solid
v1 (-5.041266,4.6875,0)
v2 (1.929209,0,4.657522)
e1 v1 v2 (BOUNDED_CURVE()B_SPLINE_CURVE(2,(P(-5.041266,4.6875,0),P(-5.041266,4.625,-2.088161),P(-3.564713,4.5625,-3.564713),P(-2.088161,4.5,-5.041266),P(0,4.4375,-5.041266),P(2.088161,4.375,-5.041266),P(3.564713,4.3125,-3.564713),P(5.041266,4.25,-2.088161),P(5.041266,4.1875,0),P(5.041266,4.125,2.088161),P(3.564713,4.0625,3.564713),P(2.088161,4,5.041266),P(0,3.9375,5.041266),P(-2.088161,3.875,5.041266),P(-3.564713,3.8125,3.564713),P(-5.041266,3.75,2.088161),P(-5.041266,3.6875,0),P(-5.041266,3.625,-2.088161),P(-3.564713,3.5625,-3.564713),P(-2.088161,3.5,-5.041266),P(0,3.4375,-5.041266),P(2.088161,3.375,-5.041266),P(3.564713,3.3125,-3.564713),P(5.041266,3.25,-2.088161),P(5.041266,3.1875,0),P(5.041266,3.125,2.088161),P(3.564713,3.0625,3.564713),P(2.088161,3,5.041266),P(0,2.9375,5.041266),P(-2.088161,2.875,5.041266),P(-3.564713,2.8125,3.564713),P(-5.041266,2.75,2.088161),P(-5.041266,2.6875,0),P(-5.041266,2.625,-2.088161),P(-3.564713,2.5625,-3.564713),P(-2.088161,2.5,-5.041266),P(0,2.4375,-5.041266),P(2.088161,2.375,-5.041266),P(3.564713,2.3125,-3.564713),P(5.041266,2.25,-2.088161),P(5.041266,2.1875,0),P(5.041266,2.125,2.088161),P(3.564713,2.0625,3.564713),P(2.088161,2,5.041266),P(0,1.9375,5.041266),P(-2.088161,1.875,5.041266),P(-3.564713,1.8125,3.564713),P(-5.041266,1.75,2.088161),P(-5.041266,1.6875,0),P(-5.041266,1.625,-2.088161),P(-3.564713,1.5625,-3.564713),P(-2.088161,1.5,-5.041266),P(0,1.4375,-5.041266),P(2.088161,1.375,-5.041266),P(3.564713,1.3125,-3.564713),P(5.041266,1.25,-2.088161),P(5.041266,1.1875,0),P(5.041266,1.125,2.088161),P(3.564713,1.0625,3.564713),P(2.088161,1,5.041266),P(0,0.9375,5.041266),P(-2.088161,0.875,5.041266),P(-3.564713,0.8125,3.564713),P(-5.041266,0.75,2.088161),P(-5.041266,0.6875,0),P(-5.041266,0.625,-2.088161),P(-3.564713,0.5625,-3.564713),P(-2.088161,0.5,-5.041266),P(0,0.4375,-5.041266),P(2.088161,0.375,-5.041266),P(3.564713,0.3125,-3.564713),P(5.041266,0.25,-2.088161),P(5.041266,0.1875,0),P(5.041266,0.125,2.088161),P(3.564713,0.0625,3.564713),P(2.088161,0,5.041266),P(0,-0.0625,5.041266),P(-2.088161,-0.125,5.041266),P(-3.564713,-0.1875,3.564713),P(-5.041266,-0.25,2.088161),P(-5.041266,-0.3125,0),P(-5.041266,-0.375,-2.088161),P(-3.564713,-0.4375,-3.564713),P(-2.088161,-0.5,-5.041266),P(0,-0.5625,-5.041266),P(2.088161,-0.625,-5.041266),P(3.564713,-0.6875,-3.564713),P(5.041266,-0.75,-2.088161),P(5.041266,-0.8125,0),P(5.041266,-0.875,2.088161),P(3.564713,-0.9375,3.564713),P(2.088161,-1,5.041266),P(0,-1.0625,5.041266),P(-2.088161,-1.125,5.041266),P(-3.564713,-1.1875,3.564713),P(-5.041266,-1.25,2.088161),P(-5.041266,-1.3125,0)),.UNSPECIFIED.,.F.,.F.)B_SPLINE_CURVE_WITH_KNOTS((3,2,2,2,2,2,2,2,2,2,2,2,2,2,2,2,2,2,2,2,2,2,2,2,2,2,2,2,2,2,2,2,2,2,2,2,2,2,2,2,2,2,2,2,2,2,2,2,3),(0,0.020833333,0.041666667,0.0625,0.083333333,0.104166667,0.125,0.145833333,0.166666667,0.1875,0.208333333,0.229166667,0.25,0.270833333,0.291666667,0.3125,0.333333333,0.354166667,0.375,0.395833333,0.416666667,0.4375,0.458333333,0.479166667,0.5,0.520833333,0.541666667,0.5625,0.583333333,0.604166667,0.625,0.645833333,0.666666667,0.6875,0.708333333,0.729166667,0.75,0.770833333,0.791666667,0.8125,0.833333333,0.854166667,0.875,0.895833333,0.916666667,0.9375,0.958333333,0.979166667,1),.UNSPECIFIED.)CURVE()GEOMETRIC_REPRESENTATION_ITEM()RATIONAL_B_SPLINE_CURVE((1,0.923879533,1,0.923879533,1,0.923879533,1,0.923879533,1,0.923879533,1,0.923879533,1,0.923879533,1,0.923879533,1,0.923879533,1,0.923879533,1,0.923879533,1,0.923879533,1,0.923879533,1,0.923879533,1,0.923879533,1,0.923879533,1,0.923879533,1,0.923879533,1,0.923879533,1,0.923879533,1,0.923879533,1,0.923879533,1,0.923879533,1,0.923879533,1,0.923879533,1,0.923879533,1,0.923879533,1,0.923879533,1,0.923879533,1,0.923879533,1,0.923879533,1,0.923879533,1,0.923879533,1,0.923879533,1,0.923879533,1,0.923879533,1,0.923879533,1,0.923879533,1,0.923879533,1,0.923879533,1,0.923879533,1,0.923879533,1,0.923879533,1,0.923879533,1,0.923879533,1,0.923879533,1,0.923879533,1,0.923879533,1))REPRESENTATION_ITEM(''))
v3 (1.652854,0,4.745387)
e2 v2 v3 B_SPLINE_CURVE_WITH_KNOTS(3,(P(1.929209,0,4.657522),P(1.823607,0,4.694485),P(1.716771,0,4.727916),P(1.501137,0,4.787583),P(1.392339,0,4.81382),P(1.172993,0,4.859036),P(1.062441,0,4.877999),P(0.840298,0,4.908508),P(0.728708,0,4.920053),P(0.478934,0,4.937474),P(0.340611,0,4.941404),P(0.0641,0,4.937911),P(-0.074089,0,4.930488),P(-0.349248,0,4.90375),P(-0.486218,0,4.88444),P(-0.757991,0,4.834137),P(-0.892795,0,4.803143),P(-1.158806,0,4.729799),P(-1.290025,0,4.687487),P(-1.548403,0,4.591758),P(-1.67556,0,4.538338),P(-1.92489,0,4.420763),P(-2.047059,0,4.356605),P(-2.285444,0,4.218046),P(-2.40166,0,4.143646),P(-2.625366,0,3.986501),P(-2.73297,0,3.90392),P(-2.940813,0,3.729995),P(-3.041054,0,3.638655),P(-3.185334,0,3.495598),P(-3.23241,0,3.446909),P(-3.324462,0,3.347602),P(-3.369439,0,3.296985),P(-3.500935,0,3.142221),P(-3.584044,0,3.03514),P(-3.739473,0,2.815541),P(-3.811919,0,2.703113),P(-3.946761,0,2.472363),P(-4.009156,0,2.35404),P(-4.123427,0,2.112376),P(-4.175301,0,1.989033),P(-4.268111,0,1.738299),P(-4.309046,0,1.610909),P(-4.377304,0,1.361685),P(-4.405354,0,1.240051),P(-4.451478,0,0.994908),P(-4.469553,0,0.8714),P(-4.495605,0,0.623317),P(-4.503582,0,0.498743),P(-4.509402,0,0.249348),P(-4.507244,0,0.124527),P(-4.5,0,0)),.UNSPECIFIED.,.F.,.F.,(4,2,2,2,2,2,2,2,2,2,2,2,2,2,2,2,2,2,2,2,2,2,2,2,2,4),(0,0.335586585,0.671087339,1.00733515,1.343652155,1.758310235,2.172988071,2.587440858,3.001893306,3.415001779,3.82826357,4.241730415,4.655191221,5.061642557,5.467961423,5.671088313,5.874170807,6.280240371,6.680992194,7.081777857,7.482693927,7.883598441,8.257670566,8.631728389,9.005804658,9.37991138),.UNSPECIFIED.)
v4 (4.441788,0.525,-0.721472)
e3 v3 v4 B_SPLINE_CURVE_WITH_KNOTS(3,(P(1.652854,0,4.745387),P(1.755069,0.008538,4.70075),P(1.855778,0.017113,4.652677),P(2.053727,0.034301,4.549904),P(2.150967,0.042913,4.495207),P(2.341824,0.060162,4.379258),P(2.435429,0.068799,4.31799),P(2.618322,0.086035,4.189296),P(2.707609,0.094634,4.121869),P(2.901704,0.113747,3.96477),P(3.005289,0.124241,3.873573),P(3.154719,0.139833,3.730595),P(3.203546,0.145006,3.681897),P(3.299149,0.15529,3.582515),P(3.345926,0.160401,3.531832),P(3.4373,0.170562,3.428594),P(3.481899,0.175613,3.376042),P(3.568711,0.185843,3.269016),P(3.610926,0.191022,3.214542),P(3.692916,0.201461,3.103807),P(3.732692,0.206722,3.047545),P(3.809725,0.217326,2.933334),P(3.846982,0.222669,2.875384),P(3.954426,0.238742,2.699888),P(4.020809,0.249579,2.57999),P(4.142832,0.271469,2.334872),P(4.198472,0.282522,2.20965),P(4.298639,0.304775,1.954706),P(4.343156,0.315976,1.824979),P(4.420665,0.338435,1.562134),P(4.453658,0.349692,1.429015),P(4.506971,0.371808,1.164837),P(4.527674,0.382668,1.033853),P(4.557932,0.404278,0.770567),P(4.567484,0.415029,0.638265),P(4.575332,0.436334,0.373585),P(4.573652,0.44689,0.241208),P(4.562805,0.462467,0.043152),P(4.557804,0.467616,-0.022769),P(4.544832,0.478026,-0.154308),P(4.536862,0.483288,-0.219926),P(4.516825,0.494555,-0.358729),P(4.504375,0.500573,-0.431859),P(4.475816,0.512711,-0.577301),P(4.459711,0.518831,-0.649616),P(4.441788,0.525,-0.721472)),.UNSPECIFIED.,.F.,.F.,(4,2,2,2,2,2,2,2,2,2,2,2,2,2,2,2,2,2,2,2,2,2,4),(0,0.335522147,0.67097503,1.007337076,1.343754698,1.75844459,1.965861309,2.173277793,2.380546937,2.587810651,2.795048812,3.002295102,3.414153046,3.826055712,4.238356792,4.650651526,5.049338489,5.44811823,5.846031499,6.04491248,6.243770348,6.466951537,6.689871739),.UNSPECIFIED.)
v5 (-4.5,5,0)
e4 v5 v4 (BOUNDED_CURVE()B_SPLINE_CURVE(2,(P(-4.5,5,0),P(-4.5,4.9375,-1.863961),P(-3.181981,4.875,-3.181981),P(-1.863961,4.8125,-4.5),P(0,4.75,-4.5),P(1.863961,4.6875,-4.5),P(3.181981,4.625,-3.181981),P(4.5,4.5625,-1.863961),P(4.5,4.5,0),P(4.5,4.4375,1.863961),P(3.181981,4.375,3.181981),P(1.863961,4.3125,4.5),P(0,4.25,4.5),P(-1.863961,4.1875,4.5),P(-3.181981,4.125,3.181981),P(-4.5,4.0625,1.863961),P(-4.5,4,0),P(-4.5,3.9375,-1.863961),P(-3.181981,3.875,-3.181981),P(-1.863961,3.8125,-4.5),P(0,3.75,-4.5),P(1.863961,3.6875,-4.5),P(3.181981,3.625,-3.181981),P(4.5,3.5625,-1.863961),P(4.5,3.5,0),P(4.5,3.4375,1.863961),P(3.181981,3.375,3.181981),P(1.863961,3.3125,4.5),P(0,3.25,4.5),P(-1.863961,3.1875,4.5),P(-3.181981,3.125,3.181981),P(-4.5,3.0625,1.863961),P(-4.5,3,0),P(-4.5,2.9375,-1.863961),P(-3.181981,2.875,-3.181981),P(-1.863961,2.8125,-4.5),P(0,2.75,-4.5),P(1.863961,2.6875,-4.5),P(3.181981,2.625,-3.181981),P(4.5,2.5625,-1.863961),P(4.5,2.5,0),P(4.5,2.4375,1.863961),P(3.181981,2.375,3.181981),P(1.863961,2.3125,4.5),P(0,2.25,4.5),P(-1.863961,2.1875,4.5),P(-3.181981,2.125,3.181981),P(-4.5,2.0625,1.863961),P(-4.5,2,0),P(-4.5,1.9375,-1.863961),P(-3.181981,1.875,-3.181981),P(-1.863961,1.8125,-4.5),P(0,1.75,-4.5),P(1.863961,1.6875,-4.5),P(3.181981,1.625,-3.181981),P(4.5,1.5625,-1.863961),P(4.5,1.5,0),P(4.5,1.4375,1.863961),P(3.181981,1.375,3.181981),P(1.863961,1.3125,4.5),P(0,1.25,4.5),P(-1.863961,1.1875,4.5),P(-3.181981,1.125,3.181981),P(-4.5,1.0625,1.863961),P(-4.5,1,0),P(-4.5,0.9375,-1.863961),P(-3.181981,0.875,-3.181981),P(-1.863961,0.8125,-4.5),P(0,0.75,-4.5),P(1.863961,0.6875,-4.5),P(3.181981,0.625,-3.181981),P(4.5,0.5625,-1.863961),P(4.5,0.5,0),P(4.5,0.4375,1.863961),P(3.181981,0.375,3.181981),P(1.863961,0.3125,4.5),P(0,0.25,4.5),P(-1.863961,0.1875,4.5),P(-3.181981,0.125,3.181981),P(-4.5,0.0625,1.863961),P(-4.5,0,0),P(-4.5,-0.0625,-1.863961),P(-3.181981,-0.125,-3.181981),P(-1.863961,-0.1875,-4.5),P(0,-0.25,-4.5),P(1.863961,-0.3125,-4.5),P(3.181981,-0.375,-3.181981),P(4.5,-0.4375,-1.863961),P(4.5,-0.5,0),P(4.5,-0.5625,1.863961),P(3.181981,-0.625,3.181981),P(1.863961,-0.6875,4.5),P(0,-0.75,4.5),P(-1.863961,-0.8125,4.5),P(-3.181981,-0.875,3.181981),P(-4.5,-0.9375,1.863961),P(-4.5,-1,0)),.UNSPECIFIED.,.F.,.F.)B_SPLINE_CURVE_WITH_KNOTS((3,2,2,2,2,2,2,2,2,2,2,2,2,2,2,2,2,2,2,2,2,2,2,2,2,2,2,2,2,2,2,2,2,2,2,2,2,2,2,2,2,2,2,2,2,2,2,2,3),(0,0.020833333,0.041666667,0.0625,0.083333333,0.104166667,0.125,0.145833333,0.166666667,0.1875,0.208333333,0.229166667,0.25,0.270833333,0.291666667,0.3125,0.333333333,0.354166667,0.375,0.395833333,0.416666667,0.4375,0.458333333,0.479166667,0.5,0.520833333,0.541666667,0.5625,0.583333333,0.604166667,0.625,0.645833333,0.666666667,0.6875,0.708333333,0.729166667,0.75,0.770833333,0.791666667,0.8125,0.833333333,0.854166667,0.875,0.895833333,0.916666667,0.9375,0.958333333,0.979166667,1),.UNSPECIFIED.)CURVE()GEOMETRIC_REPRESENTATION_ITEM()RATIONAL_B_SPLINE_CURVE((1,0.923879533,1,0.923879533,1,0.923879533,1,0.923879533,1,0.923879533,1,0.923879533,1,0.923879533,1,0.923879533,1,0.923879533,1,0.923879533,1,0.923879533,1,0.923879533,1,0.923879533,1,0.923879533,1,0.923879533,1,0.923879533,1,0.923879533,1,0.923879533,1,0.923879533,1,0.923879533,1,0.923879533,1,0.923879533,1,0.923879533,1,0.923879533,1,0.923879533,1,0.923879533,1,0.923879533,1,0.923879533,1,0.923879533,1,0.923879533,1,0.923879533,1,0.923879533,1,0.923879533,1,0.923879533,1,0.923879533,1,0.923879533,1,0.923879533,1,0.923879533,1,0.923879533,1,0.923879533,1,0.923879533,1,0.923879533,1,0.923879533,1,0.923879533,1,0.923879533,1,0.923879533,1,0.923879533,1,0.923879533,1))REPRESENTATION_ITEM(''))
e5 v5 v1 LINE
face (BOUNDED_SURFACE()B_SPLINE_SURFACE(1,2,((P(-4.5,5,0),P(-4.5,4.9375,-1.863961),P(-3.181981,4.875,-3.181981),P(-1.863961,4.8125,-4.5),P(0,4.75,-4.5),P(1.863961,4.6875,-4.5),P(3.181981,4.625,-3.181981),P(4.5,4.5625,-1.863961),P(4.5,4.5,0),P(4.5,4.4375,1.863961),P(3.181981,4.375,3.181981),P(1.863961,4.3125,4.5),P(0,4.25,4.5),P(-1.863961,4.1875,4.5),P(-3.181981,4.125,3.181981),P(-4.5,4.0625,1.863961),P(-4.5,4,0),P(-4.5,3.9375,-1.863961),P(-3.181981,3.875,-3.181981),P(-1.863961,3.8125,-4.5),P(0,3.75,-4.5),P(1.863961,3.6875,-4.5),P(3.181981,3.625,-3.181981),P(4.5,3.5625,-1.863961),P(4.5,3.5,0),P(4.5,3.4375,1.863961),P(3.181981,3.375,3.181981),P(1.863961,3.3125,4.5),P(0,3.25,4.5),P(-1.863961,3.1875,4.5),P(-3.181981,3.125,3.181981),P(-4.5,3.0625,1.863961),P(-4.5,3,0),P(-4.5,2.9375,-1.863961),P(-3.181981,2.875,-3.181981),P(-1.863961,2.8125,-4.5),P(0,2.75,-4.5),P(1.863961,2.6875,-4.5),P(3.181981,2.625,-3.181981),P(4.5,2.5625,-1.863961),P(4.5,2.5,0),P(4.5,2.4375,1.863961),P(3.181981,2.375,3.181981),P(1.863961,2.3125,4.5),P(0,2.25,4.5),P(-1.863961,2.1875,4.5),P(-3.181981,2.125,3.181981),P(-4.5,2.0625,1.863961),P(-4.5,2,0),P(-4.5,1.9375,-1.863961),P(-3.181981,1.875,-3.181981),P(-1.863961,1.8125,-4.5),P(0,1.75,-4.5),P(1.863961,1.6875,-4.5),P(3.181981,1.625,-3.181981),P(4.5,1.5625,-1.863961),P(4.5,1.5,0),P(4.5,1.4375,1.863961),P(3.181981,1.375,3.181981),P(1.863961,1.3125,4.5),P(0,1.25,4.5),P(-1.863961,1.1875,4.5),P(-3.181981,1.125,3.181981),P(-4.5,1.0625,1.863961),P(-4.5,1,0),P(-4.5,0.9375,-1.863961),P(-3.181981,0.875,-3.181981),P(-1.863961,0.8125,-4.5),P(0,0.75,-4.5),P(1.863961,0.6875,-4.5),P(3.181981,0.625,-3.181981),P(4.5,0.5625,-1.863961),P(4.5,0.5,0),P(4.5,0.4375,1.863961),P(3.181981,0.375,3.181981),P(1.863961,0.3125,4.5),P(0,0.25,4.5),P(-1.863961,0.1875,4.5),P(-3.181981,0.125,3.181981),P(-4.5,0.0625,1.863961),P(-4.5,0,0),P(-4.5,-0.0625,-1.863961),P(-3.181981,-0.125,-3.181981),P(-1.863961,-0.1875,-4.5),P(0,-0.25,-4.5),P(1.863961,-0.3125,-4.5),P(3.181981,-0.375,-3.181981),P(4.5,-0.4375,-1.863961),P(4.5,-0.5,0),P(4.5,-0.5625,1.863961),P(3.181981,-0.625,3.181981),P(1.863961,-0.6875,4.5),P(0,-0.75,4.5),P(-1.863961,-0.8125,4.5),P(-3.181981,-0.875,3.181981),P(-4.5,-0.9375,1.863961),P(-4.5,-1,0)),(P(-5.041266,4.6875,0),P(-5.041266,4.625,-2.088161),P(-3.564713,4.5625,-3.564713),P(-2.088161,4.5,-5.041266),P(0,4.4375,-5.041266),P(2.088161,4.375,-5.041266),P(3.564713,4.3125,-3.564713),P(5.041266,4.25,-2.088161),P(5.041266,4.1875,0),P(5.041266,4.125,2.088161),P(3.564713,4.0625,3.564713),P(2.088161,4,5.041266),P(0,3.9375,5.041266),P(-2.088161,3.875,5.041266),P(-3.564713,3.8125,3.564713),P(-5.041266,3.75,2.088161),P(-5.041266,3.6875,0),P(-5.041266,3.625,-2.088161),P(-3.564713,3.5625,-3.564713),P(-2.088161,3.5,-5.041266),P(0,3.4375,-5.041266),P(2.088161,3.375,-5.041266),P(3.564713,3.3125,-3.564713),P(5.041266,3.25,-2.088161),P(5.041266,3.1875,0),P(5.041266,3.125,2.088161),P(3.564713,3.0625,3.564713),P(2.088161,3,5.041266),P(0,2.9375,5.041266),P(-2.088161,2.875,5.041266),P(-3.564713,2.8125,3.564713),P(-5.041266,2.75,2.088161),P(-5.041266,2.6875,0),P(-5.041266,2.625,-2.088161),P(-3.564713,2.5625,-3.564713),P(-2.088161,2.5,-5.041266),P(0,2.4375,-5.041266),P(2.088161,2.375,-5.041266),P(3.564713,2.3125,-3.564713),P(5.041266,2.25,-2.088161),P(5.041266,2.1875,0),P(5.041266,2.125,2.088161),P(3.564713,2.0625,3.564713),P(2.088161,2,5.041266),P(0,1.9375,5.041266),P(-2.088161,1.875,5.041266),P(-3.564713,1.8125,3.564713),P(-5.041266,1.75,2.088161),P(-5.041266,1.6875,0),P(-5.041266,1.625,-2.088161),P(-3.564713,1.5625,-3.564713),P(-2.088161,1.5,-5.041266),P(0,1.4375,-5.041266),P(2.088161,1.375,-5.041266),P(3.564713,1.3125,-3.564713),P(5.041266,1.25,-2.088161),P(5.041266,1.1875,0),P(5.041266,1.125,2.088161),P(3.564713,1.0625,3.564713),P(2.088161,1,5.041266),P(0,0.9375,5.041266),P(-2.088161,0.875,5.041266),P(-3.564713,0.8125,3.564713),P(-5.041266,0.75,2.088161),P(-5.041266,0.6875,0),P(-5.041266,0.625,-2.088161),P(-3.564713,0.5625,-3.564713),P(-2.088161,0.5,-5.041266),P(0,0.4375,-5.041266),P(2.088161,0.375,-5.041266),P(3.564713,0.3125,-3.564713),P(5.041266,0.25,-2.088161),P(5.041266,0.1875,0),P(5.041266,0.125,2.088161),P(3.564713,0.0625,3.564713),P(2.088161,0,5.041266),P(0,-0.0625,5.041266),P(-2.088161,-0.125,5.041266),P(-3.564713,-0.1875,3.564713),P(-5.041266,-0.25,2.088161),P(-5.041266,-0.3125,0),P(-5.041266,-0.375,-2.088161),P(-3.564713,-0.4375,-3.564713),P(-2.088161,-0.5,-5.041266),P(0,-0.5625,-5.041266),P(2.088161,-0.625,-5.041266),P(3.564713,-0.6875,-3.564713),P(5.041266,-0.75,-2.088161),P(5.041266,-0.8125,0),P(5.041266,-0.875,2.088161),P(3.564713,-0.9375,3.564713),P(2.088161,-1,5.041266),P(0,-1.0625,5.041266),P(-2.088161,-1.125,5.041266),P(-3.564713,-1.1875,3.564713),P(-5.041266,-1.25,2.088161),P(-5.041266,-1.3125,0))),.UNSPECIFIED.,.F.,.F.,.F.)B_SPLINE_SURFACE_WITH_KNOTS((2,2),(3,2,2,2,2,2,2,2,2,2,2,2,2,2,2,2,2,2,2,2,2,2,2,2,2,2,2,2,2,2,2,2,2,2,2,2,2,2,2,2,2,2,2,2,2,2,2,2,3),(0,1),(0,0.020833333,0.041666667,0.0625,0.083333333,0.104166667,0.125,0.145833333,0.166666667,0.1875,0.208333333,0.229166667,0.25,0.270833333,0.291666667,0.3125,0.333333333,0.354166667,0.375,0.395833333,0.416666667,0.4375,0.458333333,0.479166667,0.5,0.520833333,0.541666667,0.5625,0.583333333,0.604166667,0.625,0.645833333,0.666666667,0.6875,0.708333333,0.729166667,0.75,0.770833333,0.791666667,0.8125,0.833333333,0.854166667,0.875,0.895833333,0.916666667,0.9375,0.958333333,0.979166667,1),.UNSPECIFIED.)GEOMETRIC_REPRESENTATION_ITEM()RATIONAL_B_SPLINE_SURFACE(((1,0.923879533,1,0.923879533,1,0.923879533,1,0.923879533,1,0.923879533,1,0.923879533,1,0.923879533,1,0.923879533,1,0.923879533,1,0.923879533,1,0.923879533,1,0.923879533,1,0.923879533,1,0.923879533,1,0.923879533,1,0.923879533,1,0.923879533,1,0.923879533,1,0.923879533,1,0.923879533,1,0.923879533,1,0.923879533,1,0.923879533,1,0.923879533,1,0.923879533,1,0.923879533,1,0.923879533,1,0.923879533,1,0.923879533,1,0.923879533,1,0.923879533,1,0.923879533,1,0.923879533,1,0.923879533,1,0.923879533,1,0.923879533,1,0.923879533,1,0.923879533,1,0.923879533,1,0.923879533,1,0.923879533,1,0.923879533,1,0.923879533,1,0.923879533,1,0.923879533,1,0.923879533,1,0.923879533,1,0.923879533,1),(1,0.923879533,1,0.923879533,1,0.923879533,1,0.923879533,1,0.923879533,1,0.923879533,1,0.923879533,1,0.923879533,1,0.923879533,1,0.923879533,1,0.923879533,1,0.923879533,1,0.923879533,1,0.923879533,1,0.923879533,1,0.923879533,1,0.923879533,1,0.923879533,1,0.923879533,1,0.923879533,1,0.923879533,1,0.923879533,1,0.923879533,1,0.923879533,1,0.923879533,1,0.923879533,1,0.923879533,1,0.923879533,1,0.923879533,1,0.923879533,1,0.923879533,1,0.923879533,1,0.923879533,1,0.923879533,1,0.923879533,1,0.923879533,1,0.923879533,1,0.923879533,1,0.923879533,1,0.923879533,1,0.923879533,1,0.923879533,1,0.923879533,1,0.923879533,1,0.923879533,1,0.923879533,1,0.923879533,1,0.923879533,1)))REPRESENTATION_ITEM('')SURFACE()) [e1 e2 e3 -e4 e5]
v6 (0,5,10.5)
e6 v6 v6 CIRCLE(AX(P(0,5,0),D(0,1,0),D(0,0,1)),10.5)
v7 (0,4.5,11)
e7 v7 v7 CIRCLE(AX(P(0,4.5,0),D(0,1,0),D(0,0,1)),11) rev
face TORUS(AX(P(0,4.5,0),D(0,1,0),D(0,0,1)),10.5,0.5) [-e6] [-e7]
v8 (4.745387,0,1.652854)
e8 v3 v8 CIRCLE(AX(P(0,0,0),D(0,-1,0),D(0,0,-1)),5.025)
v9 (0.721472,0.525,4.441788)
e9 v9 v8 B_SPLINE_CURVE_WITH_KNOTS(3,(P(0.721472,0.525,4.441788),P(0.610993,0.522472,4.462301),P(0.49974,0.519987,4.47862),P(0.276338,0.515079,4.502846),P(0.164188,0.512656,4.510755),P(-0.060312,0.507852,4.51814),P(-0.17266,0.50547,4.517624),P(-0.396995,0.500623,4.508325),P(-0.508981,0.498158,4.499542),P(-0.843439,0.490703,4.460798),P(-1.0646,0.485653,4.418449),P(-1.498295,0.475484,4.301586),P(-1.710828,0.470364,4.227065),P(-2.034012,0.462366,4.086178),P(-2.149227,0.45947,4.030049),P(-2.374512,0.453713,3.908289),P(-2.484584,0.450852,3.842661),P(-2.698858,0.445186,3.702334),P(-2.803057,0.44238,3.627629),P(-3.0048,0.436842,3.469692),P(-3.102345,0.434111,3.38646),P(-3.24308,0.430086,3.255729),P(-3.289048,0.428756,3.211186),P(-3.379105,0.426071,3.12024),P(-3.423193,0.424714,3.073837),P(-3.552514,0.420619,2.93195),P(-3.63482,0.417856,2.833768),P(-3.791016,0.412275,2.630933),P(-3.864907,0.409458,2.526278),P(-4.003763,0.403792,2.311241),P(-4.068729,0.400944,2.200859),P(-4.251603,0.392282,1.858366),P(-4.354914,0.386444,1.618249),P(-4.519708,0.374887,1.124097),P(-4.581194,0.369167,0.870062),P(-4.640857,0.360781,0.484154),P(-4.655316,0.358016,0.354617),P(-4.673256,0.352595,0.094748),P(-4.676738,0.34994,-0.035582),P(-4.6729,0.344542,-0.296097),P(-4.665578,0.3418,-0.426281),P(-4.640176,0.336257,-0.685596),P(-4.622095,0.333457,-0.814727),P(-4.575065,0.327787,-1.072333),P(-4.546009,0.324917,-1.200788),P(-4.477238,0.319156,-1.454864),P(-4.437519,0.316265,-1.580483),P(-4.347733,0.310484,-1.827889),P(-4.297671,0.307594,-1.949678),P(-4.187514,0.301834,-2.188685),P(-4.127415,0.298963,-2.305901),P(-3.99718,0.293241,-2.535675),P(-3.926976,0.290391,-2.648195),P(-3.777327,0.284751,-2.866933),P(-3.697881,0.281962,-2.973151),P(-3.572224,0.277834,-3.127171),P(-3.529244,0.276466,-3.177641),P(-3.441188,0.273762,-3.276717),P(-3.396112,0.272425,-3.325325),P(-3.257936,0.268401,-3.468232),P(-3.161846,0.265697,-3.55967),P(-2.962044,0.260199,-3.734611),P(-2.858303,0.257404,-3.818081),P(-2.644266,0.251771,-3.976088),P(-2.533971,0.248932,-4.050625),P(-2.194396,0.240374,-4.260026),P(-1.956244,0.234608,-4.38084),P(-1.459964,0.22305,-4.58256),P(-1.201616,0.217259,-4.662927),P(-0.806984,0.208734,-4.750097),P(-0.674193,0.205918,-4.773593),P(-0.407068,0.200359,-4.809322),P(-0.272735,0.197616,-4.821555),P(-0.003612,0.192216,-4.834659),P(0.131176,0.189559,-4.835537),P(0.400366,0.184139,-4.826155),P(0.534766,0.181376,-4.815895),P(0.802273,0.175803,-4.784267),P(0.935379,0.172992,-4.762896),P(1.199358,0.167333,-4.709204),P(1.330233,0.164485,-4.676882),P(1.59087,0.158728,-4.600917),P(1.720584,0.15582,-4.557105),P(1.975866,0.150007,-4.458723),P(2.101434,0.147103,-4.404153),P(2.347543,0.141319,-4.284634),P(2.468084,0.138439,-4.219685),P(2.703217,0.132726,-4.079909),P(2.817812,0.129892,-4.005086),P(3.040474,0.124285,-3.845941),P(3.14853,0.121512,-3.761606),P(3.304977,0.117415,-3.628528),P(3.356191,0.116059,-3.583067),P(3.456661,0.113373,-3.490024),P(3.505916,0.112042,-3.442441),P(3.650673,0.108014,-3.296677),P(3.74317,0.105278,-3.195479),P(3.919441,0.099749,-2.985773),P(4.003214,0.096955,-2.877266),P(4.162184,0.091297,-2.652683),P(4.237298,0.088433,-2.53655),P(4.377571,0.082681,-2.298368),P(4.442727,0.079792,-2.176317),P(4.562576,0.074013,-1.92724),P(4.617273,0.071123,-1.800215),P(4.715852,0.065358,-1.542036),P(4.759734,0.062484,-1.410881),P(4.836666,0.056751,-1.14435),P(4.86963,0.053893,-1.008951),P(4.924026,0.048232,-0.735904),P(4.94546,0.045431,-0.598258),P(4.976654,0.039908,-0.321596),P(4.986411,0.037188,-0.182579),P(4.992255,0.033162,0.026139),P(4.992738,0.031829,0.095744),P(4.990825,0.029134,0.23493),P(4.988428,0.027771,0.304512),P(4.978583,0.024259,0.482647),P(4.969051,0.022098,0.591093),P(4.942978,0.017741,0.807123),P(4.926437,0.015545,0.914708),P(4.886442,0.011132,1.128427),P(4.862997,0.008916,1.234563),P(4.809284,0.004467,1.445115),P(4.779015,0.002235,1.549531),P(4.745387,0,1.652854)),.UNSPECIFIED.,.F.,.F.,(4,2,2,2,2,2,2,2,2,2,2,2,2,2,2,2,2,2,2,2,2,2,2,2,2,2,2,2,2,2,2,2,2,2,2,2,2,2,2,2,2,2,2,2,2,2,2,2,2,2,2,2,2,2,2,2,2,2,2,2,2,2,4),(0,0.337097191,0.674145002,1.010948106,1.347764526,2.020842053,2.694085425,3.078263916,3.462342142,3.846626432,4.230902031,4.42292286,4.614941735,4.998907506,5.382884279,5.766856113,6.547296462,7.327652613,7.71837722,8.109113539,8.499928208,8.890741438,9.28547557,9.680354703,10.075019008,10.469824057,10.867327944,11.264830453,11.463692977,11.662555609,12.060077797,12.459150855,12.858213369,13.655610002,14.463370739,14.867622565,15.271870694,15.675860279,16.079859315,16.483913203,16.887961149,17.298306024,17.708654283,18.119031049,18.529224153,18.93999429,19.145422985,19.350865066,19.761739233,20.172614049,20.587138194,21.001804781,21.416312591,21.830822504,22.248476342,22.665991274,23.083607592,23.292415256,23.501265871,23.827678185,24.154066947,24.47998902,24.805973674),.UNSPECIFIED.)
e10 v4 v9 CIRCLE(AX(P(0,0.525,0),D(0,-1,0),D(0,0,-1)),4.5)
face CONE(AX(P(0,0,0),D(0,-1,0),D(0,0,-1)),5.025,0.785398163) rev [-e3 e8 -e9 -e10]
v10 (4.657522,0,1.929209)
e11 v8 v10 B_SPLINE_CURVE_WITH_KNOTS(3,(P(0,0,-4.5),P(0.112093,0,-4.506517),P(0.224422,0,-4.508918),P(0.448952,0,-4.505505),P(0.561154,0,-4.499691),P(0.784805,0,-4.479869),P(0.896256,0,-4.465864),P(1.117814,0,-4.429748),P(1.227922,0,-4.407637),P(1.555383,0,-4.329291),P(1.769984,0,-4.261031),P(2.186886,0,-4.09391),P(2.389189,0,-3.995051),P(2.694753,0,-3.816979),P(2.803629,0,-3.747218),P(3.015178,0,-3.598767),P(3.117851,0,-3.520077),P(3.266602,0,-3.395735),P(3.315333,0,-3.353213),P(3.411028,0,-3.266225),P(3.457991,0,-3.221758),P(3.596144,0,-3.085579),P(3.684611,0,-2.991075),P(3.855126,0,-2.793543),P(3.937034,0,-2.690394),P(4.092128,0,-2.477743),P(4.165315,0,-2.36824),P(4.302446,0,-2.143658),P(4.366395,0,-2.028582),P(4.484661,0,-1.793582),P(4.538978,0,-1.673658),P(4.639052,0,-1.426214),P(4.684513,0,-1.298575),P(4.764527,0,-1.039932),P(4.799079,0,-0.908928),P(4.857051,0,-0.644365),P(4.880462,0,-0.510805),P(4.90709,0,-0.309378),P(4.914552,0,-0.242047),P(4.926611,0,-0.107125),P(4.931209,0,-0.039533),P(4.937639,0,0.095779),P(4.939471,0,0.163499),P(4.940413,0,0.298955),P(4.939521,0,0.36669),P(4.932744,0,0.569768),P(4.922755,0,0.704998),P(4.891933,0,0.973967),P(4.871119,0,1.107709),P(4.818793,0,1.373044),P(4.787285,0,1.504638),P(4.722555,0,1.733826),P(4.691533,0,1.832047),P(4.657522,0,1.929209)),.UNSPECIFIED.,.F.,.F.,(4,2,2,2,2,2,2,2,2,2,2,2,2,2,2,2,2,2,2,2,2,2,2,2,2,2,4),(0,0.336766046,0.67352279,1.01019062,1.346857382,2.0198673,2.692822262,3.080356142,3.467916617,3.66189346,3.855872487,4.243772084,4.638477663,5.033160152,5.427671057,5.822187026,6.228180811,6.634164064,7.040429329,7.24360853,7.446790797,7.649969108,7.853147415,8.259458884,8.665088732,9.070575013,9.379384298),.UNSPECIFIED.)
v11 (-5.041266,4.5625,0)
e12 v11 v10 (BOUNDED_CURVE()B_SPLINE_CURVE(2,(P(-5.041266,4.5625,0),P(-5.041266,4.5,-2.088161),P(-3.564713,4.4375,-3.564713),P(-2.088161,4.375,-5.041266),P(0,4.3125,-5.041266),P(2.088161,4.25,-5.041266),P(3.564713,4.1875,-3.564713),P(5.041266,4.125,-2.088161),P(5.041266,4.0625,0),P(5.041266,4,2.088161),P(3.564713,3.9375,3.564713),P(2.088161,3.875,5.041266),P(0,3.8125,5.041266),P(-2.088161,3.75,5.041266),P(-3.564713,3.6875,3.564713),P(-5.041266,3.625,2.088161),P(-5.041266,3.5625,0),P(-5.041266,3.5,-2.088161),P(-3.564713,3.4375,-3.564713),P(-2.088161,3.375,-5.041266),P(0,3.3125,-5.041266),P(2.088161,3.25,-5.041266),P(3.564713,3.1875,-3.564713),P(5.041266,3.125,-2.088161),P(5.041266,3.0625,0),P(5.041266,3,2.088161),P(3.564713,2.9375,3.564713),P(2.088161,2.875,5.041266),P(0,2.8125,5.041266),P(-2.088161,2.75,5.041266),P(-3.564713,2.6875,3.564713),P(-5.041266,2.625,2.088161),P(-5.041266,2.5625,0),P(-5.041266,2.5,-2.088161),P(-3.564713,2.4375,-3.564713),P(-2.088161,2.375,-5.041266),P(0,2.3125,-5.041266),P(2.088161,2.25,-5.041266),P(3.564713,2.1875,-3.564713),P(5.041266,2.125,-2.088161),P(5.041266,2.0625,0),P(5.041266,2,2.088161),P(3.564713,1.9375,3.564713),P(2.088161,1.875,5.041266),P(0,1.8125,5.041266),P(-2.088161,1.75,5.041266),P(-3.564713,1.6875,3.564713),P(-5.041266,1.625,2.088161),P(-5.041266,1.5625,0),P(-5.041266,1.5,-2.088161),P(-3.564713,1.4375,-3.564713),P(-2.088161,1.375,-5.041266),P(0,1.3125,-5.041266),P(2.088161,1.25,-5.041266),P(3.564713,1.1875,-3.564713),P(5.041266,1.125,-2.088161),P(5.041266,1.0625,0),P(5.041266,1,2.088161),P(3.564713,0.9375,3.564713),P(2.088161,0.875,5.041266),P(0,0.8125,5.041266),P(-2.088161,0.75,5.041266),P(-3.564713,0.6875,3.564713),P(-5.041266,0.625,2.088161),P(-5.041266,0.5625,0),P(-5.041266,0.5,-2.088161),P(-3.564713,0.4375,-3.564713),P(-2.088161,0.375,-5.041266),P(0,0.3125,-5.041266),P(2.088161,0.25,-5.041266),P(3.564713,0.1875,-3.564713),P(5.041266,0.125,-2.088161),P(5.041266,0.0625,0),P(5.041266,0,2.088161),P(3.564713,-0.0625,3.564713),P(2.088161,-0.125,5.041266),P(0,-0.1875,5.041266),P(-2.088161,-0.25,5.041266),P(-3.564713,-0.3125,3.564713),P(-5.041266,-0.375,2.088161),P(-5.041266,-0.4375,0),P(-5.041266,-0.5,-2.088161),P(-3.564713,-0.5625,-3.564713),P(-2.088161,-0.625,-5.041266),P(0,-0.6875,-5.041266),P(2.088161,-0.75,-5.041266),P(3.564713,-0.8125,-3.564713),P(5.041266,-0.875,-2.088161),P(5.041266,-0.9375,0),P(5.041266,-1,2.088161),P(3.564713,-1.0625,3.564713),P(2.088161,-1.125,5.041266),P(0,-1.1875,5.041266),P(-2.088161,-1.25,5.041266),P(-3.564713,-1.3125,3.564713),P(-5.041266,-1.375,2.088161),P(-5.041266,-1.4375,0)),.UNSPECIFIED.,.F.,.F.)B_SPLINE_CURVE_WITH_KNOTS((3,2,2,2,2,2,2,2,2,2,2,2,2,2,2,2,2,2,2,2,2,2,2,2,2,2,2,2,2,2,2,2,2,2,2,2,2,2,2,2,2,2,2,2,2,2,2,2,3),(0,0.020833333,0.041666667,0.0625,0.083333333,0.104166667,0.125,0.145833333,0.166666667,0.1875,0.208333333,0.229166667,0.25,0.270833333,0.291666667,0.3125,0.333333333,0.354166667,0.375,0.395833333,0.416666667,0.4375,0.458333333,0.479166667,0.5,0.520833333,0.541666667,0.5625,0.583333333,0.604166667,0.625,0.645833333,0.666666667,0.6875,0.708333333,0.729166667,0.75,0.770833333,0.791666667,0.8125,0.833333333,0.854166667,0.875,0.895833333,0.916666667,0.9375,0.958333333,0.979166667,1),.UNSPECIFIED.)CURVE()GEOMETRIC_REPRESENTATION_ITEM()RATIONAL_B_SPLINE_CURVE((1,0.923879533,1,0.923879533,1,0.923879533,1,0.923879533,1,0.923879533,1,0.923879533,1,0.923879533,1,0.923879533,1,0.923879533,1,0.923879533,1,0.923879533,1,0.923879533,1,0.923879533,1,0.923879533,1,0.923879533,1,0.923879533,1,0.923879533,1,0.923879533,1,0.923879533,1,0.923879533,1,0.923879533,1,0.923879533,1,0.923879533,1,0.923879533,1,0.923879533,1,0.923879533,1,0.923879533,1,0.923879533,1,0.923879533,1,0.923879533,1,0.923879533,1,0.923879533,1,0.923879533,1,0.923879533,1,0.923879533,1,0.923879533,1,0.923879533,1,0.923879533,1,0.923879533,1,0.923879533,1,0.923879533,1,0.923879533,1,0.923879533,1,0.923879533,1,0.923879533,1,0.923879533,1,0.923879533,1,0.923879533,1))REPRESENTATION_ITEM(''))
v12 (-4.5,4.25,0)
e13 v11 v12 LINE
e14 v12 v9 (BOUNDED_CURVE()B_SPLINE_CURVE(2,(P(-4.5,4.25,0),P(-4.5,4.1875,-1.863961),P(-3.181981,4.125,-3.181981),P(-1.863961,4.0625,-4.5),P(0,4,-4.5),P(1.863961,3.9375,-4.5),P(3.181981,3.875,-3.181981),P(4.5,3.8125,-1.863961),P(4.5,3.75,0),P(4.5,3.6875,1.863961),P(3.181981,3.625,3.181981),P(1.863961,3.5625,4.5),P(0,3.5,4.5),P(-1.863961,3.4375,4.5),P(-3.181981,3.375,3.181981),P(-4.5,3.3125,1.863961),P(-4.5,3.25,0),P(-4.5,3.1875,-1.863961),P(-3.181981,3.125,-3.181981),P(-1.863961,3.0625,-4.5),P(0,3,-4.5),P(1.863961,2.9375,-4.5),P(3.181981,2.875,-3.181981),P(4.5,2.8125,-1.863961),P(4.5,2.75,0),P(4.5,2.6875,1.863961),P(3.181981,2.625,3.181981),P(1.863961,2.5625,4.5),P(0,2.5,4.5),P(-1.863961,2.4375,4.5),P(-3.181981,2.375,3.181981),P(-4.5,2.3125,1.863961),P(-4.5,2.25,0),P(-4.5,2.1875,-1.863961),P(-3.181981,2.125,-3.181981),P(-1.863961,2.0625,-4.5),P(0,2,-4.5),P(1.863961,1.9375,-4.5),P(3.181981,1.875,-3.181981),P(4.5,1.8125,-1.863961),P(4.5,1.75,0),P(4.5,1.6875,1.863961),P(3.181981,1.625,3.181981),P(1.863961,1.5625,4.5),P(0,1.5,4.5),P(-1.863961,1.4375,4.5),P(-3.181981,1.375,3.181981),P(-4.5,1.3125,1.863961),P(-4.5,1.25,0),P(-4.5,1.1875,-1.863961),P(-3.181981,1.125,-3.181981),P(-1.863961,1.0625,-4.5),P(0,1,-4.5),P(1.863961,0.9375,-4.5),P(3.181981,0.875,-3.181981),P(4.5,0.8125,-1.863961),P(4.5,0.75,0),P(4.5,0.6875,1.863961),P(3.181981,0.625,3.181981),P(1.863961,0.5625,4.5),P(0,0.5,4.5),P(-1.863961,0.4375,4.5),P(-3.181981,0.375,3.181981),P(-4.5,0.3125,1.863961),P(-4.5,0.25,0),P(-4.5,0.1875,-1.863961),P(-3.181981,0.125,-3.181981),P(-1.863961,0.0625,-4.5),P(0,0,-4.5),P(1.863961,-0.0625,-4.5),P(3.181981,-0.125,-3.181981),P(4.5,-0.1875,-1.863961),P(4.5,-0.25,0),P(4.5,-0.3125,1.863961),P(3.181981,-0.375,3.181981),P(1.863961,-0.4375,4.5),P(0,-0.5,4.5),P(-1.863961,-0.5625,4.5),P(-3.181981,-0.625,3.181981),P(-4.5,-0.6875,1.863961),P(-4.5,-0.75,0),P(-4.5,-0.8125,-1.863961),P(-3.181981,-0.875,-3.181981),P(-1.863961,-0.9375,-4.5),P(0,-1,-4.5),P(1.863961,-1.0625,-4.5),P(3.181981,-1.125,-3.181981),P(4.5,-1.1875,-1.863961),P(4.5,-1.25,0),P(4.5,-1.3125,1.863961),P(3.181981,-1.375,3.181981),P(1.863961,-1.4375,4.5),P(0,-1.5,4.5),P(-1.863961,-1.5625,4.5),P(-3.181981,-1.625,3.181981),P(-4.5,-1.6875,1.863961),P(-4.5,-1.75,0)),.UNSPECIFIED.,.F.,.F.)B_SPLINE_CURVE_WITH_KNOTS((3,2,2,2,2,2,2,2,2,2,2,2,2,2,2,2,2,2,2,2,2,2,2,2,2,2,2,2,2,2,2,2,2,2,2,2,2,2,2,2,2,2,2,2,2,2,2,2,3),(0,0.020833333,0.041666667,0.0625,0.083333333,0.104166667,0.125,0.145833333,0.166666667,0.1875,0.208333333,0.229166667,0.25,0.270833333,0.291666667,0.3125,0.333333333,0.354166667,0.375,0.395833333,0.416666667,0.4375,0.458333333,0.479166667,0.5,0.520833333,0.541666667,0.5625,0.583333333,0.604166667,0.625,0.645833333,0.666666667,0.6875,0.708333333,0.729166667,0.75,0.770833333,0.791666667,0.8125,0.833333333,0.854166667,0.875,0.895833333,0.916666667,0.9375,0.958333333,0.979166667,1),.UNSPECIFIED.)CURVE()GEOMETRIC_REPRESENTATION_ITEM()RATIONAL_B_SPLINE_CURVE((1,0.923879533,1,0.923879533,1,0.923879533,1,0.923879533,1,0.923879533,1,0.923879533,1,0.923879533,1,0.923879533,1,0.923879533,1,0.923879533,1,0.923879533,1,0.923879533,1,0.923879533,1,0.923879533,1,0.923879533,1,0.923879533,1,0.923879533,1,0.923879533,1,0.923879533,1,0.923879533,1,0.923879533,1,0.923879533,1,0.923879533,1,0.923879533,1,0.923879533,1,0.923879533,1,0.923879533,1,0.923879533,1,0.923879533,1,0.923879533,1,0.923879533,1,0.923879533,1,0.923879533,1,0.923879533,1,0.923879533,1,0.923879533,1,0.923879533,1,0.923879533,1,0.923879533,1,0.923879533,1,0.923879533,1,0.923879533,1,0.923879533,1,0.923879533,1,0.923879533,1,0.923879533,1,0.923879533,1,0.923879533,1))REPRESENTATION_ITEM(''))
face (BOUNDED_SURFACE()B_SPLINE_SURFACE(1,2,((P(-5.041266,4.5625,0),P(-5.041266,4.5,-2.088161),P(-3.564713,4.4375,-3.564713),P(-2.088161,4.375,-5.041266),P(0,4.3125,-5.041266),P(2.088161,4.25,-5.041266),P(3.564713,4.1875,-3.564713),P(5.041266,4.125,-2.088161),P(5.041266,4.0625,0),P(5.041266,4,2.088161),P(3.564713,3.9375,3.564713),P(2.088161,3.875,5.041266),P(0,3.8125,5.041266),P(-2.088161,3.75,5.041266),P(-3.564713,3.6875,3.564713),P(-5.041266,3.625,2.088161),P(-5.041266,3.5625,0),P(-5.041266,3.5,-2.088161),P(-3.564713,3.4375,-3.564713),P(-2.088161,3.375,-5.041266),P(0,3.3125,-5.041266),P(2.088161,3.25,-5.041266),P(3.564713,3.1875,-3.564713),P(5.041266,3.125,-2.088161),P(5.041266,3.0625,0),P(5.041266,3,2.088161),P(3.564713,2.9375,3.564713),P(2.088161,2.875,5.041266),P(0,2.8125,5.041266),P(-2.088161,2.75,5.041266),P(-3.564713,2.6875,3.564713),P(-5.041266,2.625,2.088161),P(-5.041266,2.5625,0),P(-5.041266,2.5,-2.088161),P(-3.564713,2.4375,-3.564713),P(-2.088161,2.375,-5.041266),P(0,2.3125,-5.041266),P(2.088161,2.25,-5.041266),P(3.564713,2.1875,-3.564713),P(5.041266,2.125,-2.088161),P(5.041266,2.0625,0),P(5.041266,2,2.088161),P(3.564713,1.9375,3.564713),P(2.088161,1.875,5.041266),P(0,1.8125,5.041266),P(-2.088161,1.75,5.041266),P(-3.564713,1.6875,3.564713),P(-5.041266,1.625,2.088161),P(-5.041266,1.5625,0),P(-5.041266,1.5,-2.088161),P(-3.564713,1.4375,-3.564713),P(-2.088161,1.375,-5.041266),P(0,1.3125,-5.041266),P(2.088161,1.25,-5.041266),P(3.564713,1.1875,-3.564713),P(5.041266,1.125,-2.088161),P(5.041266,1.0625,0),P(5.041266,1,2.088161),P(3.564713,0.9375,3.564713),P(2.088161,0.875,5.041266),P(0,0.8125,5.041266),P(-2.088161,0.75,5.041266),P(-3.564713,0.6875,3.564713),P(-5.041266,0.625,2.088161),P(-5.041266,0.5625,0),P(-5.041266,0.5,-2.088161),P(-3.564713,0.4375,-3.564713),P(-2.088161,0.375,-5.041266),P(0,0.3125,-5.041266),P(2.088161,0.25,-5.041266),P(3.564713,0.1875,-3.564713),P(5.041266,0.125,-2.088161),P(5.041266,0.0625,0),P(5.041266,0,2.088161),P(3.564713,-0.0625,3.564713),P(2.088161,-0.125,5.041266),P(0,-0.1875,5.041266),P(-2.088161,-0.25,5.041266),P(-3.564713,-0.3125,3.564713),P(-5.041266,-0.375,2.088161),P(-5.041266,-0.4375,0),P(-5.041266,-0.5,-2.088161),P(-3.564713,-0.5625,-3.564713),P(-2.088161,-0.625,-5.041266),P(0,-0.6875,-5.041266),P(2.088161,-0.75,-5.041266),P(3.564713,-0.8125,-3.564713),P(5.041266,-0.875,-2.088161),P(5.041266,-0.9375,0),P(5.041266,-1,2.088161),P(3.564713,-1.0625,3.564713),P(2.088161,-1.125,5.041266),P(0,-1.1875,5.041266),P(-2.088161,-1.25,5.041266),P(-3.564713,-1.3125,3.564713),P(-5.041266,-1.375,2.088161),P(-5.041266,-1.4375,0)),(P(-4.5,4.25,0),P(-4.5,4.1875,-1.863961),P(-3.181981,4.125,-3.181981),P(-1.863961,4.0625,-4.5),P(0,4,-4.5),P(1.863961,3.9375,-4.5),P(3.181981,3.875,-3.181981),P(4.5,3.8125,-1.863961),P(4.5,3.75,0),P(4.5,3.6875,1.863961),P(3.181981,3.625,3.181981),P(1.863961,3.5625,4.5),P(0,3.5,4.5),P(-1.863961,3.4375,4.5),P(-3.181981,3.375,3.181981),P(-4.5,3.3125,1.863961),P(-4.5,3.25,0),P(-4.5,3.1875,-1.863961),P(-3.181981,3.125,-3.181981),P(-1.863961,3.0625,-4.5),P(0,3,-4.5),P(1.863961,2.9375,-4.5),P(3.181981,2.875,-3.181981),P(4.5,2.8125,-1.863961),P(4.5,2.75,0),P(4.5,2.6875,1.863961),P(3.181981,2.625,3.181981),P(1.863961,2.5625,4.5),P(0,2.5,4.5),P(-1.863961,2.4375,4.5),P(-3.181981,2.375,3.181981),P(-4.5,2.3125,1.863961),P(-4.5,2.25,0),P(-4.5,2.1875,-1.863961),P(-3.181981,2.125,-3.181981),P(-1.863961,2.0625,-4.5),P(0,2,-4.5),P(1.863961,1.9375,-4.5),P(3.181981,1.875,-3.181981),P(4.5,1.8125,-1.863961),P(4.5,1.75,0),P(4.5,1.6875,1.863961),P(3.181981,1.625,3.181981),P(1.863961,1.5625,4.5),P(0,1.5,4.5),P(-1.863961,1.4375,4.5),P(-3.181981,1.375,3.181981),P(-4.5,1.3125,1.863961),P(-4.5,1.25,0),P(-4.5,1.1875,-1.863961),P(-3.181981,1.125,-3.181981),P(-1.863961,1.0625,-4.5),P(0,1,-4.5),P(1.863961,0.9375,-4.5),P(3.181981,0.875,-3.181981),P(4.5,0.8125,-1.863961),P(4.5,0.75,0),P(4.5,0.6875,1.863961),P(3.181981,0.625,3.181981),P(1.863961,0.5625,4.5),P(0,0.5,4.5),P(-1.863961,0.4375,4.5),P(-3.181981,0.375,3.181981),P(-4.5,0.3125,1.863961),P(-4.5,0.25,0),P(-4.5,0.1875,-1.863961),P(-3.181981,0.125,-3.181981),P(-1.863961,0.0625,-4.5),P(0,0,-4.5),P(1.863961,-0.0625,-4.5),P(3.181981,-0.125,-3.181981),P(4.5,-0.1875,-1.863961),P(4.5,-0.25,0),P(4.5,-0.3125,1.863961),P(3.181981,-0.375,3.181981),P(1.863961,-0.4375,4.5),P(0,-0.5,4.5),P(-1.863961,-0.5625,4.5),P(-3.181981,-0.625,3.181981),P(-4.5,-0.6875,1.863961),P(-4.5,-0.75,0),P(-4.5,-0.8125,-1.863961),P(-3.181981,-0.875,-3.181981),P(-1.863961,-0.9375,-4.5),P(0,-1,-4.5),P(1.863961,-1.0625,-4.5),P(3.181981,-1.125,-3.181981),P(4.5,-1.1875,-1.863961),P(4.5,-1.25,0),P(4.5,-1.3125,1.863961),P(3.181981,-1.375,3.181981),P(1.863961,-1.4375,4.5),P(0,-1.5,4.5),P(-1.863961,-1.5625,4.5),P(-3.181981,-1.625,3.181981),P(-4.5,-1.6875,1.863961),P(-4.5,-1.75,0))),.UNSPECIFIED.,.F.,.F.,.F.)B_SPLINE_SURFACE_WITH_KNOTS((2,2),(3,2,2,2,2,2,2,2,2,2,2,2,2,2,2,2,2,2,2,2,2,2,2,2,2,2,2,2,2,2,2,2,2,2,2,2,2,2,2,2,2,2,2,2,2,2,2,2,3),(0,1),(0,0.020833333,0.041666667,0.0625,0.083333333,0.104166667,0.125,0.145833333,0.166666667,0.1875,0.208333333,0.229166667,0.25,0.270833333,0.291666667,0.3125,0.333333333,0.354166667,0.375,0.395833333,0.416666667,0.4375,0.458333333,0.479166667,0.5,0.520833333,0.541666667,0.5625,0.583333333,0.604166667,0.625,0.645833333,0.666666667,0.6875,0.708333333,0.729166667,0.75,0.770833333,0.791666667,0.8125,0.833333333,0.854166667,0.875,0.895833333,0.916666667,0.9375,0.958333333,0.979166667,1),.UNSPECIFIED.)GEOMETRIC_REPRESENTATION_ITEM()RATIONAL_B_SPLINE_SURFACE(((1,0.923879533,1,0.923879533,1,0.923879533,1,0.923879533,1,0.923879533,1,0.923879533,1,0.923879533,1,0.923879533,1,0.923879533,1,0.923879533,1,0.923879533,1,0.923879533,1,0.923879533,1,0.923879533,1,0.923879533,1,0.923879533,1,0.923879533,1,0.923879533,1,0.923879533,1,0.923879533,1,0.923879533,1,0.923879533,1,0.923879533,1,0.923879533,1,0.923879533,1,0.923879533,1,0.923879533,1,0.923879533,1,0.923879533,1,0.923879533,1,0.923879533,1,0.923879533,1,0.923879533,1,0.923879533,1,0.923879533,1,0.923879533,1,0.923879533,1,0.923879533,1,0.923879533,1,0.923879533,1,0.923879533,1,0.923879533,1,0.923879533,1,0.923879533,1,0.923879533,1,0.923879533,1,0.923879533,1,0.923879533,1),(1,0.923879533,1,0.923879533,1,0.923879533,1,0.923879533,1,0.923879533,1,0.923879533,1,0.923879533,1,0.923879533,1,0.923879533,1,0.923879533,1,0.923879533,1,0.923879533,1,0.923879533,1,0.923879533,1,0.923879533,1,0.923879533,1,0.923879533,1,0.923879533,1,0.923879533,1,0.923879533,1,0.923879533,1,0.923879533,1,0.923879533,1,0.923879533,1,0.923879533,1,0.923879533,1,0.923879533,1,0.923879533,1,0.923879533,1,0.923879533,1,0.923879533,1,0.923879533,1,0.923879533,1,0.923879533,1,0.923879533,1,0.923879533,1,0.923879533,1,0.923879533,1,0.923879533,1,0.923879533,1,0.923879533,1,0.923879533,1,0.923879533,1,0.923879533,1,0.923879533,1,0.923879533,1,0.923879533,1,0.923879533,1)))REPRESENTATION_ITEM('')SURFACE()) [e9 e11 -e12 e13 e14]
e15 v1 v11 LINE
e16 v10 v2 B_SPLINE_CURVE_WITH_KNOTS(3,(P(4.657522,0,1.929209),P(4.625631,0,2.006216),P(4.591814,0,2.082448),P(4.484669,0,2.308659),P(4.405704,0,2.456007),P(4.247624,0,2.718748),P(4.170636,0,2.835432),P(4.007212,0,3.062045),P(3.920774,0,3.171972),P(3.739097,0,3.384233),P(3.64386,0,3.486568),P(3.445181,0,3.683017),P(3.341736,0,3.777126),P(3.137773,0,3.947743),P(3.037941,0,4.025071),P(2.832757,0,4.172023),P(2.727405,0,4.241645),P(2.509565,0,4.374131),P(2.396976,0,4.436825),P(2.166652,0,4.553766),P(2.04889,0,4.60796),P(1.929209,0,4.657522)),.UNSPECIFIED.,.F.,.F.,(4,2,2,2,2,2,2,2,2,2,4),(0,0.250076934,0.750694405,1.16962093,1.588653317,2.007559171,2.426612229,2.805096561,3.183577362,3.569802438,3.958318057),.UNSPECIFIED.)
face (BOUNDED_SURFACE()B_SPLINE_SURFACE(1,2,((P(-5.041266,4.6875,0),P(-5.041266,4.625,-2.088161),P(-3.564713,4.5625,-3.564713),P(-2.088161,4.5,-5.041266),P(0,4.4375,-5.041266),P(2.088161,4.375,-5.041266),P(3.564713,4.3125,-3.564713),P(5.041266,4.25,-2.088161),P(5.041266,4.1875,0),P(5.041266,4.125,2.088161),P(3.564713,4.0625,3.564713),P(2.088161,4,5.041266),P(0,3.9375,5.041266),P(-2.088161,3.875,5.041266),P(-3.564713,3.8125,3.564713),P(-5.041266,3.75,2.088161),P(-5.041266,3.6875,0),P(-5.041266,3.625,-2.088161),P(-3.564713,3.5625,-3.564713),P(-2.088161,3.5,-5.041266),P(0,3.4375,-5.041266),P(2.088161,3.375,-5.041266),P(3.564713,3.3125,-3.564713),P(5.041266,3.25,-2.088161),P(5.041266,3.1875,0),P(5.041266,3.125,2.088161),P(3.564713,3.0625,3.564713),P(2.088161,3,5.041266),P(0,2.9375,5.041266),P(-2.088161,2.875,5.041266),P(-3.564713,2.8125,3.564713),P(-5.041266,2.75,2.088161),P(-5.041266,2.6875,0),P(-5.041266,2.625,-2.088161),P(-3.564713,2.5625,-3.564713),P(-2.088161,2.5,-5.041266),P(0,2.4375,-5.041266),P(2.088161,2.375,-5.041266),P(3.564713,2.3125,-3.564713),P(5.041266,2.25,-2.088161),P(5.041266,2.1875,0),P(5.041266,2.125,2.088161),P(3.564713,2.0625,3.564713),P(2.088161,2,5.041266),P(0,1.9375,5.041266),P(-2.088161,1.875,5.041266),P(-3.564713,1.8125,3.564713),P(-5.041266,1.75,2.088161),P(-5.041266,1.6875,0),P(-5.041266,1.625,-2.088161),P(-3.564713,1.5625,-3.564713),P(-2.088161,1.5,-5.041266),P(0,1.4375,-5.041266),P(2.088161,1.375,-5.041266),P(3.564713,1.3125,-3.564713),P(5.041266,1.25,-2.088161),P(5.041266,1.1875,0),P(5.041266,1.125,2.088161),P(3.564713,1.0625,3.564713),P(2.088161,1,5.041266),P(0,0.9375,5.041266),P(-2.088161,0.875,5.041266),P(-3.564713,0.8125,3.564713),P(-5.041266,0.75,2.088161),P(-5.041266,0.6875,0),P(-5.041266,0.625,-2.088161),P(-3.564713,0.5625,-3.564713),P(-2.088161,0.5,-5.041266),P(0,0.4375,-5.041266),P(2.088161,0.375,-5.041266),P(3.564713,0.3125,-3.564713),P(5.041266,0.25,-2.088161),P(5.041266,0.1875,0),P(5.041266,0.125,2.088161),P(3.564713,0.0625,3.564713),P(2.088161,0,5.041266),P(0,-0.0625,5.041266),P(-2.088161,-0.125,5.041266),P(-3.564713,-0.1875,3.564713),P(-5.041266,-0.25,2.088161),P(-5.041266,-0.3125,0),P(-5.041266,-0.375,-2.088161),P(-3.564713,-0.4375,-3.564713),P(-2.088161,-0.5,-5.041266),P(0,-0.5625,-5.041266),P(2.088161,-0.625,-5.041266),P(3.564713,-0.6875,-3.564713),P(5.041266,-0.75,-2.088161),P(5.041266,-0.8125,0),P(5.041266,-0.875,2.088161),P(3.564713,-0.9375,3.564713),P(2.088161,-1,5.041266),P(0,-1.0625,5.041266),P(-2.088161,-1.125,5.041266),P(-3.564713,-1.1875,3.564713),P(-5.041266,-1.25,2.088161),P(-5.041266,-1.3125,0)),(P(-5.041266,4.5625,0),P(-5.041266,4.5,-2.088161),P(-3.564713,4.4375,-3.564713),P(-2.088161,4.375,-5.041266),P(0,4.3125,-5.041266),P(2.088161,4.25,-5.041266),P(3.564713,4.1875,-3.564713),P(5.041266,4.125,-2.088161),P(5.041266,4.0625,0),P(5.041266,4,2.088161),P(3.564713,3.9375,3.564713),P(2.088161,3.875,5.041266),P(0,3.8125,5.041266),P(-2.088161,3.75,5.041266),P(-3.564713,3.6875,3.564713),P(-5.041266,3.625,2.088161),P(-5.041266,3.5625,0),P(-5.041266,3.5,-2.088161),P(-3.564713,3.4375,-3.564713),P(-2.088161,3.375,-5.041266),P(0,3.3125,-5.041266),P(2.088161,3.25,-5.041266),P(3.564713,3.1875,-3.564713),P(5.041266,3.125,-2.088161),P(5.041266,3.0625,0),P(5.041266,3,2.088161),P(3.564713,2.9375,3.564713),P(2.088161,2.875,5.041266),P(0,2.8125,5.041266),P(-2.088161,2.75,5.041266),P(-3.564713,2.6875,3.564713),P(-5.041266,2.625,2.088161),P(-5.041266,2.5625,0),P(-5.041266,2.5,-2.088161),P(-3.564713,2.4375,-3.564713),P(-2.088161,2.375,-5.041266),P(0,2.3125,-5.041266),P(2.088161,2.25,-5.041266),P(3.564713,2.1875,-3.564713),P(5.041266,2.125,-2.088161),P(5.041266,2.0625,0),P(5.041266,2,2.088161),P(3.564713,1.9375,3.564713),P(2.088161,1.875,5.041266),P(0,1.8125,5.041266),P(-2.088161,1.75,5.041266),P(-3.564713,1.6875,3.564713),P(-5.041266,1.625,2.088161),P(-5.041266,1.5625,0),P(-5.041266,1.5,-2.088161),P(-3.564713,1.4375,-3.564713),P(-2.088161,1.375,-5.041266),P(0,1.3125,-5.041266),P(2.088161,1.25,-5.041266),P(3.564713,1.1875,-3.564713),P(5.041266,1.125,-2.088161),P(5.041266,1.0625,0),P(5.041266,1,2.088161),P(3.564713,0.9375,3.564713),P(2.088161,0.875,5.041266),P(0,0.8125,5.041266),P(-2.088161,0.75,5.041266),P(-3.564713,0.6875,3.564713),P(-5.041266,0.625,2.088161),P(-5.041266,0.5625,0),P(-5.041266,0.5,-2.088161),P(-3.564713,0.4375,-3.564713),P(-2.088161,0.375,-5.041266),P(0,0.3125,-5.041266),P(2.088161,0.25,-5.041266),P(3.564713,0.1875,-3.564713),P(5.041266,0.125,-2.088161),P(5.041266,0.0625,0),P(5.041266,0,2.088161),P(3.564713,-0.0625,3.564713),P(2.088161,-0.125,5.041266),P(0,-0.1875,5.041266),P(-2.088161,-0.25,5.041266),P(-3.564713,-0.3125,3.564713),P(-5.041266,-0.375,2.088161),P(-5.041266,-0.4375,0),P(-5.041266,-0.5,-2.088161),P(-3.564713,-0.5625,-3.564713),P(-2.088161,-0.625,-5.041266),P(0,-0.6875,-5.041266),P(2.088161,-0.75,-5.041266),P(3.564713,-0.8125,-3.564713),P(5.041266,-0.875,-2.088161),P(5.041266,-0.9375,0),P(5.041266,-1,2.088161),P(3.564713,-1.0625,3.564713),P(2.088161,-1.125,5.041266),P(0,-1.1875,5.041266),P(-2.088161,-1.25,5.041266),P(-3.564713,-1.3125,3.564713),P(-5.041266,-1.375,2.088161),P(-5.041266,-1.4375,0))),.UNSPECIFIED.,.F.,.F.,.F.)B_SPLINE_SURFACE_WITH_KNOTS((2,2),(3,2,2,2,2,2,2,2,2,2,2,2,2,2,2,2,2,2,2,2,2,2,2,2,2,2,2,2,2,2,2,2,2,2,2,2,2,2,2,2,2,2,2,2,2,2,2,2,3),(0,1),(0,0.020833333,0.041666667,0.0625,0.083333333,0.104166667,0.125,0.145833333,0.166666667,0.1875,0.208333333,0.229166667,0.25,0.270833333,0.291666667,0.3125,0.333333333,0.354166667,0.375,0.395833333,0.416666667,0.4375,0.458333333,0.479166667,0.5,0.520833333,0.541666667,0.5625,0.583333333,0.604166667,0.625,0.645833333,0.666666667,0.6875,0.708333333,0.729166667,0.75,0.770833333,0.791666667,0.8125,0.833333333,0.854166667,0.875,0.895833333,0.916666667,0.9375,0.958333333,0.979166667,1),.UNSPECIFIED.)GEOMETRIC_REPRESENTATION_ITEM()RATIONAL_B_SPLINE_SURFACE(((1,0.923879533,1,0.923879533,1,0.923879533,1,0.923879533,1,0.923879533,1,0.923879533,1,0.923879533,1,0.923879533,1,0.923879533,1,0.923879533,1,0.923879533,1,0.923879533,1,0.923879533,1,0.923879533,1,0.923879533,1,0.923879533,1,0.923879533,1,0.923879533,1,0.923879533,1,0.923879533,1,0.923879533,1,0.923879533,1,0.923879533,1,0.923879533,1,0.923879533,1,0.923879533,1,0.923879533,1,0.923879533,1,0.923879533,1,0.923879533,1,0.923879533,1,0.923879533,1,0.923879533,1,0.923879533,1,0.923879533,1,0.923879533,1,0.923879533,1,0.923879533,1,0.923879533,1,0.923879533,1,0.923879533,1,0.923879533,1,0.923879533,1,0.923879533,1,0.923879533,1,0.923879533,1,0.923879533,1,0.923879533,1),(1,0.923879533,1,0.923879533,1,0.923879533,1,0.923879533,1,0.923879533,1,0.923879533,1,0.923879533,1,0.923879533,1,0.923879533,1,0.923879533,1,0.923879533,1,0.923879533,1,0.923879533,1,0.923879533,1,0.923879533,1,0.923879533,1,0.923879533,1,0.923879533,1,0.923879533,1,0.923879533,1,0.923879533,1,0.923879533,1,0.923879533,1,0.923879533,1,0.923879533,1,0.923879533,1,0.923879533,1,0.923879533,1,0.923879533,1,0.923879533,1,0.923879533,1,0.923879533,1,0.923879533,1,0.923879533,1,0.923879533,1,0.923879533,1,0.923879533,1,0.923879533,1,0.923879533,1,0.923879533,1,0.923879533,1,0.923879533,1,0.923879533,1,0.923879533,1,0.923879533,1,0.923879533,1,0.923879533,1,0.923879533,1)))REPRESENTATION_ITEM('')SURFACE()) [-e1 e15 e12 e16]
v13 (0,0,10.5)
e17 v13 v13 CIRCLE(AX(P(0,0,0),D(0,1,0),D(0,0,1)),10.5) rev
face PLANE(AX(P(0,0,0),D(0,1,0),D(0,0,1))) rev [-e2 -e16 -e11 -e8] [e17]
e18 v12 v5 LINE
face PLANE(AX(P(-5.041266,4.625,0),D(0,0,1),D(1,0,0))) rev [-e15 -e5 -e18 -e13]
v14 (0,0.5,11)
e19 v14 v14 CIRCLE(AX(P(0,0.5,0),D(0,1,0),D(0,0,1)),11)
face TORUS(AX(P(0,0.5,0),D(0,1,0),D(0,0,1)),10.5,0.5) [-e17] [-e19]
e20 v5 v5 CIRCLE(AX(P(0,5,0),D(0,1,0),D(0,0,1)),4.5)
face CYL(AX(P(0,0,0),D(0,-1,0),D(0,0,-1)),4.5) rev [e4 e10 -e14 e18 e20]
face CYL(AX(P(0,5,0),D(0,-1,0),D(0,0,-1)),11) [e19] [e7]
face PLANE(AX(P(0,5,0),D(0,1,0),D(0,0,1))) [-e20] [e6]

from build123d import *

# Parameters (mm, degrees)
ESBO_O1_R                = 11
RESSALTO_EXTRUS_O1_DEPTH = 5
FILETE1_R                = 0.5
ROSCA1_PITCH             = 1


with BuildPart() as part:
    # Esboço1 → Ressalto-extrusão1 (new body)
    with BuildSketch(Plane(origin=(0, 0, 0), x_dir=(1, 0, 0), z_dir=(0, 1, 0))):
        with Locations(Location((0, 0, 0), (0, 0, 270))):
            Circle(ESBO_O1_R)
    extrude(amount=RESSALTO_EXTRUS_O1_DEPTH)

    # Filete1
    filete1_edges = [part.edges().sort_by_distance(p)[0] for p in [
        (0, 0, -11),
        (0, 5, -11),
    ]]
    fillet(filete1_edges, radius=FILETE1_R)

    # Esboço4 → Furo roscado de M10x1.01 (revolve, cut)
    with BuildSketch(Plane(origin=(0, 0, 0), x_dir=(0, 0, -1), z_dir=(1, 0, 0))):
        Polygon((0, 0), (0, 5), (4.5, 5), (4.5, 0.525), (5.025, 0), align=None)
    revolve(axis=Axis((0, -6.35, 0), (0, 1, 0)), mode=Mode.SUBTRACT)

    # Rosca1: the profile of Perfil da rosca1 profile screwed along a right-hand helix of 6 turns, 8 arcs to a turn; built about Z, then put on its axis
    rosca1_z = Axis((0, 0, 0), (0, 0, 1))
    rosca1_corners = [(4.4997, 0, -0.000173205), (5.041265875, 0, 0.312499999), (5.041265875, 0, 0.437499999), (4.4997, 0, 0.750173202)]
    with BuildLine(mode=Mode.PRIVATE) as rosca1_profile:
        Line(rosca1_corners[0], rosca1_corners[1])
        Line(rosca1_corners[1], rosca1_corners[2])
        Line(rosca1_corners[2], rosca1_corners[3])
        Line(rosca1_corners[3], rosca1_corners[0])
    rosca1_cap = Face(rosca1_profile.wire())
    rosca1_turn_angles = [0, 22.5, 45, 67.5, 90, 112.5, 135, 157.5, 180, 202.5, 225, 247.5, 270, 292.5, 315, 337.5, 360]
    rosca1_turn_weights = [1, 0.9238795325112867, 1, 0.9238795325112867, 1, 0.9238795325112867, 1, 0.9238795325112867, 1, 0.9238795325112867, 1, 0.9238795325112867, 1, 0.9238795325112867, 1, 0.9238795325112867, 1]
    rosca1_turn_rails = [Edge.make_bspline([Vector(p[0], p[1], 0).rotate(rosca1_z, rosca1_turn_angles[k]) / rosca1_turn_weights[k] + Vector(0, 0, p[2] + ROSCA1_PITCH * rosca1_turn_angles[k] / 360) for k in range(17)], [0, 0, 0, 1, 1, 2, 2, 3, 3, 4, 4, 5, 5, 6, 6, 7, 7, 8, 8, 8], 2, rosca1_turn_weights) for p in rosca1_corners]
    rosca1_turn_sides = [Face.make_surface_from_curves(rosca1_turn_rails[p[0]], rosca1_turn_rails[p[1]]) for p in [(0, 1), (1, 2), (2, 3), (3, 0)]]
    rosca1 = Plane(origin=(0, 5, 0), x_dir=(-1, 0, 0), z_dir=(0, -1, 0)) * Solid(Shell([*[p.moved(Location((0, 0, ROSCA1_PITCH * i))) for i in range(6) for p in rosca1_turn_sides], rosca1_cap, rosca1_cap.rotate(rosca1_z, 2160).moved(Location((0, 0, ROSCA1_PITCH * 2160 / 360)))]))
    add(rosca1, mode=Mode.SUBTRACT)


solid = part.part
